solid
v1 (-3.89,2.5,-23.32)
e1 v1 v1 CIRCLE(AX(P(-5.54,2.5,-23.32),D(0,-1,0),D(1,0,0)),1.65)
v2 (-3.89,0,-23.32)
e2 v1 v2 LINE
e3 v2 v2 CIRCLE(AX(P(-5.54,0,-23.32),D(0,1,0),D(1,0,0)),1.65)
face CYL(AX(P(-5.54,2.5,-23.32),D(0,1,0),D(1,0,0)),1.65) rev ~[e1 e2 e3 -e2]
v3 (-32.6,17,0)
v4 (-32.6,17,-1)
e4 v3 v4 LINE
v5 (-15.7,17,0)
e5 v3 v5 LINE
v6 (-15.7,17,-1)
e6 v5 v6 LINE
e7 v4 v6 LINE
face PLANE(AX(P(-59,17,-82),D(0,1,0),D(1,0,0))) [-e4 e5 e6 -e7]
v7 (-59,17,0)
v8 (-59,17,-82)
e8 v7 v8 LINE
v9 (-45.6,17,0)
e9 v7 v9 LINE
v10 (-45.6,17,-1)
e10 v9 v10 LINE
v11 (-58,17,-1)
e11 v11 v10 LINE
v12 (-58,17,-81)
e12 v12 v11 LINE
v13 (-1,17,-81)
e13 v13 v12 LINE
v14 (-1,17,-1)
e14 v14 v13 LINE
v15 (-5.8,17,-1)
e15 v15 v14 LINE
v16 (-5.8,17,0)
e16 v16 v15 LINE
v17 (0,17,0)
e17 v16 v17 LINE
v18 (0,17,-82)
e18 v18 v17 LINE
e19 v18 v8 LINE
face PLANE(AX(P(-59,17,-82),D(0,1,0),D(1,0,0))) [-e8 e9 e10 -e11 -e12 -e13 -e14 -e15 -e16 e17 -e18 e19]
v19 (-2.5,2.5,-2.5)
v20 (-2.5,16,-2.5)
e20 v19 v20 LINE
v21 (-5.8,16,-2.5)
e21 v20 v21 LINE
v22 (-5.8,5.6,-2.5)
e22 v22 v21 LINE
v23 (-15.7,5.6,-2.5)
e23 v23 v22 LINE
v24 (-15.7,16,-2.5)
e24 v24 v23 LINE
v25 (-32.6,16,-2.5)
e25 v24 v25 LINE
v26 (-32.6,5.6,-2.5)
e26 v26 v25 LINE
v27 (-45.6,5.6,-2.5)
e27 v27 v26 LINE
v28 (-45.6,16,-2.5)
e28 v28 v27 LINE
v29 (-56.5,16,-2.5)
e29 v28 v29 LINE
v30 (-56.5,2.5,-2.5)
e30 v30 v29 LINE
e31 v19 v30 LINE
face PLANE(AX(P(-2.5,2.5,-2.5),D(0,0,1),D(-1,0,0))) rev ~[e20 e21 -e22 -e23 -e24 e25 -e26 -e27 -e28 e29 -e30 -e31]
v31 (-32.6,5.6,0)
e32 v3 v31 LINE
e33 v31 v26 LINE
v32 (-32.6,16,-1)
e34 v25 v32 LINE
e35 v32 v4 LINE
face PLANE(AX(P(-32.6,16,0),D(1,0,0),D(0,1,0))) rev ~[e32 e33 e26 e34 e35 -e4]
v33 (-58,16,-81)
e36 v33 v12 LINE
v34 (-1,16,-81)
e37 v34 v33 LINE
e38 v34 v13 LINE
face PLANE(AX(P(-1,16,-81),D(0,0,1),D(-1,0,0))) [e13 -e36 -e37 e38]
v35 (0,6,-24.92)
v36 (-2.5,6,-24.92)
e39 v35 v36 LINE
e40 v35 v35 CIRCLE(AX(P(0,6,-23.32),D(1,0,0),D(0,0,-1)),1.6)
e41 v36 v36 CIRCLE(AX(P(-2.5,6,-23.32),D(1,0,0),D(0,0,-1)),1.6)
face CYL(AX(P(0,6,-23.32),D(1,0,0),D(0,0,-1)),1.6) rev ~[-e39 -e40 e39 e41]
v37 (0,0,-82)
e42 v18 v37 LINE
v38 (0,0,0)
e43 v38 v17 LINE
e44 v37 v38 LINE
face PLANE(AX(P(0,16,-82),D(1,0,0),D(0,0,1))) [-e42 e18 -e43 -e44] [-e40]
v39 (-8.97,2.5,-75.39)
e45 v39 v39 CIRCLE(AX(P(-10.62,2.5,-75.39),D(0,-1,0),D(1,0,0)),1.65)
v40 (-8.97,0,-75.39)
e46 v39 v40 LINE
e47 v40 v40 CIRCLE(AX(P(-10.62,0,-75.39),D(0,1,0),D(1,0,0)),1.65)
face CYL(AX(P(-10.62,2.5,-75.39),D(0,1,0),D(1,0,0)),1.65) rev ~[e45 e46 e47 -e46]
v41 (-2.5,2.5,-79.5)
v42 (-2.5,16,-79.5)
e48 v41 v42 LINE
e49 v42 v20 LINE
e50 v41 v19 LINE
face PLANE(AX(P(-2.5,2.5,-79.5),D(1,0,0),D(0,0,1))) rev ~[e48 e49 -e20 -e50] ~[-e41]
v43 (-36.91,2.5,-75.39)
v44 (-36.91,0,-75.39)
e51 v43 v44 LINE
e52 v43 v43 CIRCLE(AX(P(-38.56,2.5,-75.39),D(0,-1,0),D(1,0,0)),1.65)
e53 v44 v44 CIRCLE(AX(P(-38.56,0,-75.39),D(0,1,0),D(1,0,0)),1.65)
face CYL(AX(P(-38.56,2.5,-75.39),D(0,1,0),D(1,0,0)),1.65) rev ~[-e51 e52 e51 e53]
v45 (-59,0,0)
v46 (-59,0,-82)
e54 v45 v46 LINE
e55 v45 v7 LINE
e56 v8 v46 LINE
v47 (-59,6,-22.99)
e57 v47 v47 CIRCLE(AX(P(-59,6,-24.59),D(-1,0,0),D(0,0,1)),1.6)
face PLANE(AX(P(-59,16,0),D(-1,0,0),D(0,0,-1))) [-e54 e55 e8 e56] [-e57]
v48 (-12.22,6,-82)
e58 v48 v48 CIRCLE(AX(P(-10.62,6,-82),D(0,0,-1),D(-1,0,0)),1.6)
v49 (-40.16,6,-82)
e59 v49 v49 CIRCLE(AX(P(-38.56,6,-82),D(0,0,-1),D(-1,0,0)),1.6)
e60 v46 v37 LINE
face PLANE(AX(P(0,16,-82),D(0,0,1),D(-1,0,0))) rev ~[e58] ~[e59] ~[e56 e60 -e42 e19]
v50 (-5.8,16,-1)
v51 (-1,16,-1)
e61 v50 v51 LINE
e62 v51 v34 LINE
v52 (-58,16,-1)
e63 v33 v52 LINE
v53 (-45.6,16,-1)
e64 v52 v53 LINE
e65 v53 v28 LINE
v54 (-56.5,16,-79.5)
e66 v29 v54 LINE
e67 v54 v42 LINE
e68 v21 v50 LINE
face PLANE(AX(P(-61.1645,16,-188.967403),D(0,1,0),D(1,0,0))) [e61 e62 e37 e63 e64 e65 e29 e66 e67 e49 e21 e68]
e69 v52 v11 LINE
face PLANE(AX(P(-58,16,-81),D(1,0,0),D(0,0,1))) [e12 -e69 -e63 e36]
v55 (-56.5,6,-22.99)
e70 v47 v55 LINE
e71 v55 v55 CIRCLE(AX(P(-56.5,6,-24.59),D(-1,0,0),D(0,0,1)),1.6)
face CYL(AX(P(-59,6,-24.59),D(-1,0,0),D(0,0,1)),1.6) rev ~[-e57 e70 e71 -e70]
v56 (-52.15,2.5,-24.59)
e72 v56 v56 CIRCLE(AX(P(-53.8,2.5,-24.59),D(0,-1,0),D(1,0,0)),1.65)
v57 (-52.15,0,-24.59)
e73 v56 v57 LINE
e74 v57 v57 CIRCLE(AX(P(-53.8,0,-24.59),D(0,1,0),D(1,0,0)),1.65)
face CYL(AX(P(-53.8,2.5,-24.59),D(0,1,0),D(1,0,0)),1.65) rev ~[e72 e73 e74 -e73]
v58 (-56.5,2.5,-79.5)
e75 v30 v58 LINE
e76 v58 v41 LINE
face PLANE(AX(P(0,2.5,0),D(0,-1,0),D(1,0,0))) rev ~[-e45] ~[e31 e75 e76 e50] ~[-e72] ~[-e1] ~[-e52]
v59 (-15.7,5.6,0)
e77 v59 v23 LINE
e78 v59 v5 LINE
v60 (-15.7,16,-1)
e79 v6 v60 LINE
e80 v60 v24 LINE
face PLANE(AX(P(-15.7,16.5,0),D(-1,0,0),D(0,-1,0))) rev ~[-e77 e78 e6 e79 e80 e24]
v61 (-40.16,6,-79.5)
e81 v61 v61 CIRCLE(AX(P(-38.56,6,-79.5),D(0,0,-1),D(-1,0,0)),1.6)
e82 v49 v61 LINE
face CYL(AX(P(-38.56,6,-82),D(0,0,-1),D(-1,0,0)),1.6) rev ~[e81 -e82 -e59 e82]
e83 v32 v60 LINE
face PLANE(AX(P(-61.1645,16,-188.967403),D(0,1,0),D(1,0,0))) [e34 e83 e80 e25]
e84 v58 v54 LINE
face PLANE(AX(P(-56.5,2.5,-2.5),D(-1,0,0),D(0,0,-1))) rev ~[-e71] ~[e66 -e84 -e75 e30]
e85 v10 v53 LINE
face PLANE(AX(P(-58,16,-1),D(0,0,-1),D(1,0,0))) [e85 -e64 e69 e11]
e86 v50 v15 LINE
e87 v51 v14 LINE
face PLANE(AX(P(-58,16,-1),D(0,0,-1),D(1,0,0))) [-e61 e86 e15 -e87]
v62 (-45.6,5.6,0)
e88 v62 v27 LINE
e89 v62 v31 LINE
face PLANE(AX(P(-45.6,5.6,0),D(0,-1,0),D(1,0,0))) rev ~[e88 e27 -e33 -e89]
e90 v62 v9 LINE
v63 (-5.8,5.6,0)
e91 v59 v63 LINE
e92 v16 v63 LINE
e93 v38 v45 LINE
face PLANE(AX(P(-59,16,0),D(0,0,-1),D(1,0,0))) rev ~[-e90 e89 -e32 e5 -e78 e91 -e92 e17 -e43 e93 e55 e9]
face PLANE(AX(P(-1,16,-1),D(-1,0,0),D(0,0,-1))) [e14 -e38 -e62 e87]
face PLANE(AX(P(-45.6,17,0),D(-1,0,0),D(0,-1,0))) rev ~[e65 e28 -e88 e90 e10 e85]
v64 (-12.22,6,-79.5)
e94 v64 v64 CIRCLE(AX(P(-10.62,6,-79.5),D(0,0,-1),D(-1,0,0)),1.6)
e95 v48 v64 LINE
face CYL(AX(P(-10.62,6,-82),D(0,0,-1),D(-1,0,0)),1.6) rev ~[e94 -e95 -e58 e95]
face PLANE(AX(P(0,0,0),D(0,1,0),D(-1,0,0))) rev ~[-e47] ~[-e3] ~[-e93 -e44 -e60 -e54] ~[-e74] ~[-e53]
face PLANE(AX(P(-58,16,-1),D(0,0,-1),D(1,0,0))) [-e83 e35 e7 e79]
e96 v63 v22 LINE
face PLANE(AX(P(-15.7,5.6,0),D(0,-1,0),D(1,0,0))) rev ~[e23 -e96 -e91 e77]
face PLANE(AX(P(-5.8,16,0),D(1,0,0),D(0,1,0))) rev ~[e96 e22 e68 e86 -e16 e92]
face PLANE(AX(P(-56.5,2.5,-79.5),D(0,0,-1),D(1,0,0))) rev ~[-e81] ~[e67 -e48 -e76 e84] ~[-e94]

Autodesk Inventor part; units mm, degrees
ref_plane "YZ Plane" through (0, 0, 0) normal (1, 0, 0) x (0, 1, 0)
ref_plane "XZ Plane" through (0, 0, 0) normal (0, 1, 0) x (-1, 0, 0)
sketch "Sketch1" plane through (0, 0, 0) normal (0, 1, 0) x (-1, 0, 0)
  line L0 (0, 0) -> (59, 0)
  line L1 (59, 0) -> (59, -82)
  line L2 (59, -82) -> (0, -82)
  line L3 (0, -82) -> (0, 0)
  dimension "d0" = 82
  dimension "d1" = 59
extrude "Extrusion1" add sketch "Sketch1" along normal blind 32
ref_plane "Work Plane1" through (0, 2.5, 0) normal (0, -1, 0) x (1, 0, 0)
sketch "Sketch2" plane through (0, 2.5, 0) normal (0, -1, 0) x (1, 0, 0)
  line L0 (-2.5, -2.5) -> (-56.5, -2.5)
  line L1 (-56.5, -2.5) -> (-56.5, -79.5)
  line L2 (-56.5, -79.5) -> (-2.5, -79.5)
  line L3 (-2.5, -79.5) -> (-2.5, -2.5)
  line L4 (0, 0) -> (0, -82) projected
  line L5 (-59, 0) -> (0, 0) projected
  line L6 (-59, -82) -> (-59, 0) projected
  line L7 (0, -82) -> (-59, -82) projected
  dimension "d5" = 2.5
  dimension "d6" = 2.5
  dimension "d7" = 2.5
  dimension "d8" = 2.5
extrude "Extrusion2" cut sketch "Sketch2" against normal blind 27 contours L3 L2 L1 L0
sketch "Sketch3" plane through (0, 2.5, 0) normal (0, -1, 0) x (1, 0, 0)
  line L0 (-3, -3) -> (-56, -3) construction
  line L1 (-56, -3) -> (-56, -79) construction
  line L2 (-56, -79) -> (-3, -79) construction
  line L3 (-3, -79) -> (-3, -3) construction
  line L4 (-2.5, -2.5) -> (-2.5, -79.5) projected
  line L5 (-56.5, -2.5) -> (-2.5, -2.5) projected
  line L6 (-56.5, -79.5) -> (-56.5, -2.5) projected
  line L7 (-2.5, -79.5) -> (-56.5, -79.5) projected
  circle A0 centre (-53.8, -24.59) radius 1.65
  circle A1 centre (-5.54, -23.32) radius 1.65
  circle A2 centre (-38.56, -75.39) radius 1.65
  circle A3 centre (-10.62, -75.39) radius 1.65
  point P0 (0, 0)
  dimension "d11" = 0.5
  dimension "d12" = 0.5
  dimension "d13" = 0.5
  dimension "d14" = 0.5
  dimension "d15" = 3.3
  dimension "d16" = 20.32
  dimension "d17" = 2.54
  dimension "d18" = 7.62
  dimension "d19" = 72.39
  dimension "d20" = 21.59
  dimension "d22" = 50.8
  dimension "d23" = 35.56
  dimension "d24" = 72.39
extrude "Extrusion3" cut sketch "Sketch3" along normal blind 27 contours A0 | A1 | A2 | A3
sketch "Sketch4" plane through (-59, 0, 0) normal (0, 0, 1) x (1, 0, 0)
  line L0 (13.4, 5.6) -> (26.4, 5.6)
  line L1 (26.4, 5.6) -> (26.4, 16.5)
  line L2 (26.4, 16.5) -> (13.4, 16.5)
  line L3 (13.4, 16.5) -> (13.4, 5.6)
  line L4 (43.3, 5.6) -> (53.2, 5.6)
  line L5 (53.2, 5.6) -> (53.2, 16.5)
  line L6 (53.2, 16.5) -> (43.3, 16.5)
  line L7 (43.3, 16.5) -> (43.3, 5.6)
  line L8 (56.5, 2.5) -> (2.5, 2.5) projected
  line L9 (2.5, 2.5) -> (2.5, 29.5) projected
  line L10 (56.5, 2.5) -> (56.5, 29.5) projected
  point P0 (59, 0)
  dimension "d27" = 13
  dimension "d28" = 10.9
  dimension "d29" = 9.9
  dimension "d31" = 14
  dimension "d32" = 10.9
  dimension "d33" = 3.3
extrude "Extrusion4" cut sketch "Sketch4" against normal blind 5
sketch "Sketch5" plane through (0, 0, -82) normal (0, 0, -1) x (-1, 0, 0)
  line L0 (11.5, 24.5) -> (33.5, 24.5)
  line L1 (33.5, 24.5) -> (33.5, 20.5)
  line L2 (33.5, 20.5) -> (11.5, 20.5)
  line L3 (11.5, 20.5) -> (11.5, 24.5)
  line L4 (37.5, 24.5) -> (43.5, 24.5)
  line L5 (43.5, 24.5) -> (43.5, 20.5)
  line L6 (43.5, 20.5) -> (37.5, 20.5)
  line L7 (37.5, 20.5) -> (37.5, 24.5)
  line L8 (56.5, 2.5) -> (2.5, 2.5) projected
  line L9 (2.5, 2.5) -> (2.5, 29.5) projected
  point P0 (0, 0)
  dimension "d36" = 22
  dimension "d37" = 4
  dimension "d38" = 4
  dimension "d39" = 22
  dimension "d40" = 9
  dimension "d41" = 6
  dimension "d42" = 4
extrude "Extrusion5" cut sketch "Sketch5" against normal blind 5
sketch "Sketch6" plane through (-59, 0, -82) normal (-1, 0, 0) x (0, 0, 1)
  circle A0 centre (57.41, 6) radius 1.6
  line L0 (79.5, 2.5) -> (79.5, 29.5) projected
  line L1 (82, 0) -> (0, 0) projected
  dimension "d45" = 3.2
  dimension "d46" = 22.09
  dimension "d47" = 6
sketch "Sketch7" plane through (0, 0, 0) normal (1, 0, 0) x (0, 0, -1)
  circle A0 centre (23.32, 6) radius 1.6
  line L0 (82, 0) -> (0, 0) projected
  line L1 (2.5, 2.5) -> (2.5, 29.5) projected
  dimension "d48" = 6
  dimension "d49" = 20.82
  dimension "d50" = 3.2
sketch "Sketch8" plane through (0, 0, -82) normal (0, 0, -1) x (-1, 0, 0)
  circle A0 centre (10.62, 6) radius 1.6
  circle A1 centre (38.56, 6) radius 1.6
  line L0 (59, 0) -> (0, 0) projected
  line L1 (2.5, 2.5) -> (2.5, 29.5) projected
  dimension "d51" = 3.2
  dimension "d52" = 3.2
  dimension "d53" = 6
  dimension "d54" = 6
  dimension "d55" = 8.12
  dimension "d56" = 36.06
extrude "Extrusion6" cut sketch "Sketch6" against normal blind 5
extrude "Extrusion7" cut sketch "Sketch7" against normal blind 5
extrude "Extrusion8" cut sketch "Sketch8" against normal blind 5
sketch "Sketch9" plane through (-59, 0, 0) normal (0, 0, 1) x (1, 0, 0)
  line L0 (-2.1645, 16) -> (66.4826, 16)
  line L1 (59, 0) -> (0, 0) projected
  dimension "d63" = 16
split body "Split1" sketch "Sketch9" result one side removed curves L0 removed pieces at (-39.3333, 31.5, -54.6667)
sketch "Sketch10" plane through (-59, 16, -82) normal (0, 1, 0) x (1, 0, 0)
  line L0 (0, -82) -> (0, 0) projected
  line L1 (59, 0) -> (59, -82) projected
  line L2 (0, -82) -> (59, -82)
  line L3 (59, -82) -> (59, 0)
  line L4 (59, 0) -> (0, 0)
  line L5 (0, 0) -> (0, -82)
  line L6 (58, -1) -> (1, -1)
  line L7 (1, -1) -> (1, -81)
  line L8 (1, -81) -> (58, -81)
  line L9 (58, -81) -> (58, -1)
  dimension "d64" = 1
  dimension "d65" = 1
  dimension "d66" = 1
  dimension "d67" = 1
extrude "Extrusion9" add sketch "Sketch10" along normal blind 1
sketch "Sketch11" plane through (-59, 0, 0) normal (0, 0, 1) x (1, 0, 0)
  line L0 (13.4, 16) -> (13.4, 5.6) projected
  line L1 (58, 17) -> (1, 17) projected
  line L2 (13.4, 16) -> (26.4, 16)
  line L3 (26.4, 16) -> (26.4, 17)
  line L4 (26.4, 17) -> (13.4, 17)
  line L5 (13.4, 17) -> (13.4, 16)
  line L6 (43.3, 16) -> (43.3, 5.6) projected
  line L7 (43.3, 16) -> (53.2, 16)
  line L8 (53.2, 16) -> (53.2, 17)
  line L9 (53.2, 17) -> (43.3, 17)
  line L10 (43.3, 17) -> (43.3, 16)
  line L11 (26.4, 16) -> (26.4, 5.6) projected
  line L12 (53.2, 16) -> (53.2, 5.6) projected
  point P0 (59, 0)
extrude "Extrusion10" cut sketch "Sketch11" against normal blind 1
properties part number "Arduino_Box_Lower"
